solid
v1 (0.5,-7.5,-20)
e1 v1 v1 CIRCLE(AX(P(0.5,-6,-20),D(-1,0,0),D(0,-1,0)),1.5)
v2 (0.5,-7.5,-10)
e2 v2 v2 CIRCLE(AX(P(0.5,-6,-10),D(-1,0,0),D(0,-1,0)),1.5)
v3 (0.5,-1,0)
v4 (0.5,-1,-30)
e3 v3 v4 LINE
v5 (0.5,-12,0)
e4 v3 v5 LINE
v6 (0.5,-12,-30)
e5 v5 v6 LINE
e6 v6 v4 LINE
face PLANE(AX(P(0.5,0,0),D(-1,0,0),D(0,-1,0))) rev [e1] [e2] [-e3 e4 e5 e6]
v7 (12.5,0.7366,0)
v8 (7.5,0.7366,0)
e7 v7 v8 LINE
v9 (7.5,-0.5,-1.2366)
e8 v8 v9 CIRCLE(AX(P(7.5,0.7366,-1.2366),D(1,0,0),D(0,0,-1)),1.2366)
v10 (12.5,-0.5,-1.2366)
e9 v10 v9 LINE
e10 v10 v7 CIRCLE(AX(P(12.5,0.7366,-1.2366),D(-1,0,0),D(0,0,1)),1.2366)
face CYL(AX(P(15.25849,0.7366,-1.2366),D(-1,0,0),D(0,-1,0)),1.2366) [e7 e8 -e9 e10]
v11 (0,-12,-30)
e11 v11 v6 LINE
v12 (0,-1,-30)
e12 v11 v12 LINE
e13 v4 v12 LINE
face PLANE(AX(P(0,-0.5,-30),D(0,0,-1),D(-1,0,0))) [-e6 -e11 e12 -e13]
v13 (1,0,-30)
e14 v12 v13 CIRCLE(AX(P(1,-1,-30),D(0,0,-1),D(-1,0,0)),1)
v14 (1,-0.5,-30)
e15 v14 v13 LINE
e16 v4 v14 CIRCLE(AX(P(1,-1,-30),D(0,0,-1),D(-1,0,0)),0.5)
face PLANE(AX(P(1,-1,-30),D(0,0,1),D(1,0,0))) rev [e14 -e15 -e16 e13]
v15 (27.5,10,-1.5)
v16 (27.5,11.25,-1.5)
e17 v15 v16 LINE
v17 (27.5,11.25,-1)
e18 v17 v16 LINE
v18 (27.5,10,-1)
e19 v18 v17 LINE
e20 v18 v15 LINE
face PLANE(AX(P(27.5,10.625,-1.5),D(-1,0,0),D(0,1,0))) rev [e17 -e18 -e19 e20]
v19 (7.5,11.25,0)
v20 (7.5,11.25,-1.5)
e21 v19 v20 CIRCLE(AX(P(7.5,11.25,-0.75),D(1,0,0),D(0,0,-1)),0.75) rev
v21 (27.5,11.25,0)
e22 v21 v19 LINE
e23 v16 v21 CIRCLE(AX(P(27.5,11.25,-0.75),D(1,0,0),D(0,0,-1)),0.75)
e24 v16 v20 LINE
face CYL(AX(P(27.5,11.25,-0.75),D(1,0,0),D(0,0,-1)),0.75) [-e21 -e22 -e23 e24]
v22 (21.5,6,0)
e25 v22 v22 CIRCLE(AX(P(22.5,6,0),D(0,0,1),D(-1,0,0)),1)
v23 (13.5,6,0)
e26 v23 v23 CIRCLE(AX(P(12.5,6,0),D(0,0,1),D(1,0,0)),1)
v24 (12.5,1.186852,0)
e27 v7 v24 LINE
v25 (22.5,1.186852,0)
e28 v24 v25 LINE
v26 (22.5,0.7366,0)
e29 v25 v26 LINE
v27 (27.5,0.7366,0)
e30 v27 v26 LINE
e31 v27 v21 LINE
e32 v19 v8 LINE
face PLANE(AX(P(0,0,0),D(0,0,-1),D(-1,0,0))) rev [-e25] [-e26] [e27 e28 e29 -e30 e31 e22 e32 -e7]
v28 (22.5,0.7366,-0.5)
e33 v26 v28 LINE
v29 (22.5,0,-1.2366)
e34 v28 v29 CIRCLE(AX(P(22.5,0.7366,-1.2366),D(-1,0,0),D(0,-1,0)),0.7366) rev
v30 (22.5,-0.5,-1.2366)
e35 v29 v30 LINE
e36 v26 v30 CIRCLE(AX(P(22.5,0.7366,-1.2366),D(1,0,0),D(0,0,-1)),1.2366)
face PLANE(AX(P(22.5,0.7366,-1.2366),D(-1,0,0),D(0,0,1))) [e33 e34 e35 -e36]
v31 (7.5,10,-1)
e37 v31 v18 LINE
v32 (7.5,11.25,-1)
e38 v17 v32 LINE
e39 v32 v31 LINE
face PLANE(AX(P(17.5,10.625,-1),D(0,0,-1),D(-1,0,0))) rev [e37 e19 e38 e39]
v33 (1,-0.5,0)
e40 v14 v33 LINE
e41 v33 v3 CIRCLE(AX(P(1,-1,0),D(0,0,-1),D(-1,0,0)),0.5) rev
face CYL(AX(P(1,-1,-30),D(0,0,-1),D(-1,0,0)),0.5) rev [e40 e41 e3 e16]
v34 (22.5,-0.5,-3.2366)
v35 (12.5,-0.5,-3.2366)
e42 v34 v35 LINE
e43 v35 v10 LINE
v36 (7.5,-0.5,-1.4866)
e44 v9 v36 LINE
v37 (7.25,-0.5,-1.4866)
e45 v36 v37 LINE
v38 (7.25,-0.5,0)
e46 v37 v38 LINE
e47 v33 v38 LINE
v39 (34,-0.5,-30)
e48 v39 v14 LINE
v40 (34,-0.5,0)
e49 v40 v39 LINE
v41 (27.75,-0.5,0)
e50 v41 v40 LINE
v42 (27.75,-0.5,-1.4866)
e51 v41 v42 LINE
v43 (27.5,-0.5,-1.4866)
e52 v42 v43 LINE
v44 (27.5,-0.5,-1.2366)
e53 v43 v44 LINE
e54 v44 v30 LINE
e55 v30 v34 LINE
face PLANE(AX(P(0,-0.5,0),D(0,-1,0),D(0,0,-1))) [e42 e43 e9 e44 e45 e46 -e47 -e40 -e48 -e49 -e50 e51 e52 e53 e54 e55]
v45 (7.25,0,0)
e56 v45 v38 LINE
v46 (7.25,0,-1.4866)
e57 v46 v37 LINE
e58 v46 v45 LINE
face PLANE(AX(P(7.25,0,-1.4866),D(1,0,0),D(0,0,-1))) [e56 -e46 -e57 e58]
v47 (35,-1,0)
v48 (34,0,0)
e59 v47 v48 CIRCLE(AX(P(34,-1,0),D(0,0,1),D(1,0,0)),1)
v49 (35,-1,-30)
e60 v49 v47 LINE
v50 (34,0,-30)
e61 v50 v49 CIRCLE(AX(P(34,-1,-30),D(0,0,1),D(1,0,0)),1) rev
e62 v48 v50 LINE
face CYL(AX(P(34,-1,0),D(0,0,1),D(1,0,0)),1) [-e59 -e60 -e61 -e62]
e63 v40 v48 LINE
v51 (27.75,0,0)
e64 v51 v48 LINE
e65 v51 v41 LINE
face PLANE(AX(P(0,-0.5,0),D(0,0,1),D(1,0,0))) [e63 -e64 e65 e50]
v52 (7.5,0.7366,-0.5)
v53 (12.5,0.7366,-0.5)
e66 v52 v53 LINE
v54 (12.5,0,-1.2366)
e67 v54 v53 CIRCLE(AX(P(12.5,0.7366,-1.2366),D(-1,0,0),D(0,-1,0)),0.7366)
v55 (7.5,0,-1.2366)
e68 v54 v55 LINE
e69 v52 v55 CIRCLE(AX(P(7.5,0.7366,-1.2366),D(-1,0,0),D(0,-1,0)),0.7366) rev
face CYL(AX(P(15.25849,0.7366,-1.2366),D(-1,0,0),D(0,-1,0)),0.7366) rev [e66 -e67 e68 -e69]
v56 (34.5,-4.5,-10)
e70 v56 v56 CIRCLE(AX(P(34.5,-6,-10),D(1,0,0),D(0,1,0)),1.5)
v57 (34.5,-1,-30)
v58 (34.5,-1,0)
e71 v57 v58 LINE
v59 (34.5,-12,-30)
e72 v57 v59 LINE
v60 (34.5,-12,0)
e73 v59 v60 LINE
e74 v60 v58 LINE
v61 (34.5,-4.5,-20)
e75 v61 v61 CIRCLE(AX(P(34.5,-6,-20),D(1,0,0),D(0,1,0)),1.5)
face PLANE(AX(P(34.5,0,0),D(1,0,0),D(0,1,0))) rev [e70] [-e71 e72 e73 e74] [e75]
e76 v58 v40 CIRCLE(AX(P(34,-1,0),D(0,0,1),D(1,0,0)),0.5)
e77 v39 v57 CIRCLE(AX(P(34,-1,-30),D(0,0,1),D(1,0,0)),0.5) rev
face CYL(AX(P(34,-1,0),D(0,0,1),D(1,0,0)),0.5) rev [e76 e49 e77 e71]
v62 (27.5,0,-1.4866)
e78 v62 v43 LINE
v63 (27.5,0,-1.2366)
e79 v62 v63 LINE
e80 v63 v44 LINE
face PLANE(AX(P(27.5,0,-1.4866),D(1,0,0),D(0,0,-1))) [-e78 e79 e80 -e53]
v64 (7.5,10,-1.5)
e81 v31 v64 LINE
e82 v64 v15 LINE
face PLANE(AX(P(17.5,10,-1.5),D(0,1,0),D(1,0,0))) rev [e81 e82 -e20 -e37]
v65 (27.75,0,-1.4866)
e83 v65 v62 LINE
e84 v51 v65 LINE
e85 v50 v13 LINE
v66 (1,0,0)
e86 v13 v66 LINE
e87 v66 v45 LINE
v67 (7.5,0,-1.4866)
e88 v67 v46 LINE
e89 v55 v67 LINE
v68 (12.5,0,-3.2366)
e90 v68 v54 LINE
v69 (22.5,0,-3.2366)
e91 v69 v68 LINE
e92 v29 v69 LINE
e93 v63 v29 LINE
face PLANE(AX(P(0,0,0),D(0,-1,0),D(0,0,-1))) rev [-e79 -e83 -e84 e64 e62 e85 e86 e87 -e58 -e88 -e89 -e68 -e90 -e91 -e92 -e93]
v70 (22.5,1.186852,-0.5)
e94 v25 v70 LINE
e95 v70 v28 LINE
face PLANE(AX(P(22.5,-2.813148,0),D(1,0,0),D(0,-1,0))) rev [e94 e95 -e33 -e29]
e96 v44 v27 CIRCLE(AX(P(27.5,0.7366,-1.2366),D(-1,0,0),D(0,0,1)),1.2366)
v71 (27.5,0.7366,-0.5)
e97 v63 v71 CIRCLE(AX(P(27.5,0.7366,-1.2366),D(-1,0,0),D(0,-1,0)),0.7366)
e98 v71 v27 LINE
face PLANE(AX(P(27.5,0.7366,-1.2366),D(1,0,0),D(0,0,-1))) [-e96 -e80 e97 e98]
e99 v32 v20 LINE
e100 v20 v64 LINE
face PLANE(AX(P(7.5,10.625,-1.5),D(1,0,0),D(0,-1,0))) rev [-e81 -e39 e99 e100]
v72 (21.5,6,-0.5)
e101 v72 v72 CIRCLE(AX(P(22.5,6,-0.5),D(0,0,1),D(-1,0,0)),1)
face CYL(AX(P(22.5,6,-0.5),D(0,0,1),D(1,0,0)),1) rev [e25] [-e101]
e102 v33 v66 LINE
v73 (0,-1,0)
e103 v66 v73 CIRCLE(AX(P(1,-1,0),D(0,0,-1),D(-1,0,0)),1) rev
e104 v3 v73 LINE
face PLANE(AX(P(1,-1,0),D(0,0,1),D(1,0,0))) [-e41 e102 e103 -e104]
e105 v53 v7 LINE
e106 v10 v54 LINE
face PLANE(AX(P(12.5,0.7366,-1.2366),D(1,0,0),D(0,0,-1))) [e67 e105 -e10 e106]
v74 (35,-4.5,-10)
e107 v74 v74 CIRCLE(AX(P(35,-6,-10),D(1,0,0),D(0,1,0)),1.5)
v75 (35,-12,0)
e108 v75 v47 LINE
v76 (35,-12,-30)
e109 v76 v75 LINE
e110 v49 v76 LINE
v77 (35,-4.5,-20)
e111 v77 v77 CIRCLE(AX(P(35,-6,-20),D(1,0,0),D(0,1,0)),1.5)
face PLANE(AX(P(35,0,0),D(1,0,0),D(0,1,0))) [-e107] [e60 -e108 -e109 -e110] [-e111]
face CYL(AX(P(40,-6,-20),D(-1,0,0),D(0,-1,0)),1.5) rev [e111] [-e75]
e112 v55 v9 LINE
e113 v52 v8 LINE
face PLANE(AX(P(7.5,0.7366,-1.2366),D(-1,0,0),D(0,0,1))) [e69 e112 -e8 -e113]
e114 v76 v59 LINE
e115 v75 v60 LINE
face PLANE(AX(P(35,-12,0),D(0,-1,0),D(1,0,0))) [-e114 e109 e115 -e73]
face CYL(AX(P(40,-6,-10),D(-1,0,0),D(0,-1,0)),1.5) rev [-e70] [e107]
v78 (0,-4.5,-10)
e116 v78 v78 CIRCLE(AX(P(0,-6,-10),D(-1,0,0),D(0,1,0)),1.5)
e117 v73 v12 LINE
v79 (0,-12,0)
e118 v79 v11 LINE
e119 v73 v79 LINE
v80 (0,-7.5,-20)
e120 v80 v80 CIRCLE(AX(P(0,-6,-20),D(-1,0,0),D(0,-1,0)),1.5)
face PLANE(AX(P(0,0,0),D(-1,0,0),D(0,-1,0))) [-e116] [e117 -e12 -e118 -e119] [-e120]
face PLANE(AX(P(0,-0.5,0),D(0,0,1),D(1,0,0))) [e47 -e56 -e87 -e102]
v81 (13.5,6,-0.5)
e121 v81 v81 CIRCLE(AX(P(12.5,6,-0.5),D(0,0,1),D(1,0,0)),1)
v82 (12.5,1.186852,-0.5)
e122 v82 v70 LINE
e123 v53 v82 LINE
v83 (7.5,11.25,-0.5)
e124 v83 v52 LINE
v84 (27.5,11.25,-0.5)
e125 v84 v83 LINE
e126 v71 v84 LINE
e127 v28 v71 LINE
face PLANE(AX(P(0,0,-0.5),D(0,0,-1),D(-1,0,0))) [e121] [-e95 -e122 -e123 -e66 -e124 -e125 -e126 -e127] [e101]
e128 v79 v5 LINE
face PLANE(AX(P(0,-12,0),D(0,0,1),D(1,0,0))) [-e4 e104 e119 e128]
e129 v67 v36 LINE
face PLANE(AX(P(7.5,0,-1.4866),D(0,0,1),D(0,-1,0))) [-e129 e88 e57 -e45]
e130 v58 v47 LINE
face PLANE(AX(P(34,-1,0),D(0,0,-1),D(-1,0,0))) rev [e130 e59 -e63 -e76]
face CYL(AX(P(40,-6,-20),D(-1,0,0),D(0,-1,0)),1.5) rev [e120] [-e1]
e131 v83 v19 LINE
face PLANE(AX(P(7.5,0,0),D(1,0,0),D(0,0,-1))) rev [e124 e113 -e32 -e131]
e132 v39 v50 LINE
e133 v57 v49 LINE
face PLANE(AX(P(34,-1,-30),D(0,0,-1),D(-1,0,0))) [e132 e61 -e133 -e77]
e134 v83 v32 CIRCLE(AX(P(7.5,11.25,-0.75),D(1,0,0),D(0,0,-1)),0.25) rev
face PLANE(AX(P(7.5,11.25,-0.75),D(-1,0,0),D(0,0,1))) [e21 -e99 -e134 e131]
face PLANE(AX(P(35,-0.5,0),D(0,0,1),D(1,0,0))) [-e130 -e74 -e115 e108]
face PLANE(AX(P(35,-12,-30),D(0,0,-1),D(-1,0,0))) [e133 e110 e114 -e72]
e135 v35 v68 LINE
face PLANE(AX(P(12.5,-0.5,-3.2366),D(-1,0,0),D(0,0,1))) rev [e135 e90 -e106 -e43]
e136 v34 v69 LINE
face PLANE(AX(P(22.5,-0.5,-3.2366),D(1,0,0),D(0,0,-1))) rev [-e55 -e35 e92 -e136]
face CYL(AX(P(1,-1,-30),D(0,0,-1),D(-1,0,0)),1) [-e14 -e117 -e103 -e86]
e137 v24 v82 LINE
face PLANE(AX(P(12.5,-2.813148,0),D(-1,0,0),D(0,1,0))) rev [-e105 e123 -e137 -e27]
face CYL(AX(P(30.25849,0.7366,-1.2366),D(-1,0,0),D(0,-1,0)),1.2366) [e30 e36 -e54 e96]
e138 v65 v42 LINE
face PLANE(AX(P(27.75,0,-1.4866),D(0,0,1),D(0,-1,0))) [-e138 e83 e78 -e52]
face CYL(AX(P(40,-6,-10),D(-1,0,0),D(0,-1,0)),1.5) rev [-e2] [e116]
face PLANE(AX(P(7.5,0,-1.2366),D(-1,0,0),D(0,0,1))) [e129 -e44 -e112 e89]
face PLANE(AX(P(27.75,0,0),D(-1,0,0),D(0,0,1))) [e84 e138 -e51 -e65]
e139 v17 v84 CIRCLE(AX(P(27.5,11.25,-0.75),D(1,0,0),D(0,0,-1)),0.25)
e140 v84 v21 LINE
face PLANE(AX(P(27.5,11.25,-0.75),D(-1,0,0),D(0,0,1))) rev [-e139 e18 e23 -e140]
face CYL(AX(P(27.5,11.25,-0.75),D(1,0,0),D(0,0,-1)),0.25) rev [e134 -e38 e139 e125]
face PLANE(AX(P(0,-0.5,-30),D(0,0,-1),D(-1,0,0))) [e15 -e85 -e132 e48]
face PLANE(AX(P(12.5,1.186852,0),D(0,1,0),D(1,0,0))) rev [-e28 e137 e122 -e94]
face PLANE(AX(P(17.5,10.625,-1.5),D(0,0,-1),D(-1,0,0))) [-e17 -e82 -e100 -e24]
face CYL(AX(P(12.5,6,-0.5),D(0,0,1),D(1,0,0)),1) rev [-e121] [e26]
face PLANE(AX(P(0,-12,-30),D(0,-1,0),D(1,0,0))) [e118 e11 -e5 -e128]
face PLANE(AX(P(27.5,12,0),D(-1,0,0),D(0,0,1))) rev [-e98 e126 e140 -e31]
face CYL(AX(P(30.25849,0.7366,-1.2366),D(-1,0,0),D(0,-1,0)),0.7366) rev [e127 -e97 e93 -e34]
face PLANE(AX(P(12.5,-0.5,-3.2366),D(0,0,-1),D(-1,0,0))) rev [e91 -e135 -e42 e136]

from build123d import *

# Parameters (mm, degrees)
SKETCH1_W                     = 35
SKETCH1_H                     = 30
BASE_FLANGE1_DEPTH            = 0.5
EDGE_FLANGE1_STRIP_W          = 3
EDGE_FLANGE1_STRIP_H          = 0.5
EDGE_FLANGE1_STRIP_CUT_DEPTH  = 30
EDGE_FLANGE1_DEPTH            = 30
EDGE_FLANGE2_STRIP_W          = 3
EDGE_FLANGE2_STRIP_H          = 0.5
EDGE_FLANGE2_STRIP_CUT_DEPTH  = 30
EDGE_FLANGE2_DEPTH            = 30
SKETCH12_R                    = 1.5
CUT_EXTRUDE1_DEPTH            = 40
EDGE_FLANGE4_STRIP_W          = 3.4732
EDGE_FLANGE4_STRIP_H          = 0.5
EDGE_FLANGE4_STRIP_CUT_DEPTH  = 20
EDGE_FLANGE4_RELIEF_W         = 3.7232
EDGE_FLANGE4_RELIEF_H         = 0.25
EDGE_FLANGE4_RELIEF_CUT_DEPTH = 0.5
EDGE_FLANGE4_DEPTH            = 20
SKETCH25_R                    = 1
CUT_EXTRUDE2_DEPTH            = 0.5
HEM1_START                    = 7.5
HEM1_DEPTH                    = 20
HEM1_2_DEPTH                  = 20
UNFOLD1_OUTLINE_W             = 20
UNFOLD1_OUTLINE_H             = 1.5
UNFOLD1_DEPTH                 = 13
UNFOLD1_START                 = -0.5
UNFOLD1_2_OUTLINE_W           = 20
UNFOLD1_2_OUTLINE_H           = 11.076547656
UNFOLD1_2_OUTLINE_R           = 1
UNFOLD1_2_DEPTH               = 0.5
UNFOLD1_START_2               = 7.5
UNFOLD1_3_DEPTH               = 20
SKETCH30_W                    = 10
SKETCH30_H                    = 4
CUT_EXTRUDE3_DEPTH            = 0.5
FOLD1_START                   = 7.5
FOLD1_DEPTH                   = 20
FOLD1_START_2                 = 13.5000001
FOLD1_2_DEPTH                 = 7.9999998
FOLD1_3_DEPTH                 = 3.9999999
FOLD1_START_3                 = 23.5000001
FOLD1_4_DEPTH                 = 3.9999999
FOLD1_5_DEPTH                 = 5
FOLD1_START_4                 = 22.5
FOLD1_6_DEPTH                 = 5
FOLD1_START_5                 = -0.5
FOLD1_7_DEPTH                 = 0.5
FOLD1_START_6                 = 11.4999999
FOLD1_8_DEPTH                 = 12.0000002


with BuildPart() as part:
    # Base-Flange1: sheet metal written as solids
    # Sketch1 → Base-Flange1 (new body)
    with BuildSketch(Plane(origin=(0, 0, 0), x_dir=(1, 0, 0), z_dir=(0, 1, 0))):
        with Locations((17.5, 15)):
            Rectangle(SKETCH1_W, SKETCH1_H)
    extrude(amount=-BASE_FLANGE1_DEPTH)

    # Edge-Flange1: sheet metal written as solids
    # Edge-Flange1 strip (on a plane across the edge) → Edge-Flange1 strip cut (cut)
    with BuildSketch(Plane(origin=(35, -0.5, -30), x_dir=(-1, 0, 0), z_dir=(0, 0, 1))):
        with Locations((-0.5, -0.25)):
            Rectangle(EDGE_FLANGE1_STRIP_W, EDGE_FLANGE1_STRIP_H)
    extrude(amount=EDGE_FLANGE1_STRIP_CUT_DEPTH, mode=Mode.SUBTRACT)

    # Edge-Flange1 section (on a plane across the edge) → Edge-Flange1 (add)
    with BuildSketch(Plane(origin=(35, -0.5, -30), x_dir=(-1, 0, 0), z_dir=(0, 0, 1))):
        with BuildLine():
            Line((0, 0.5), (0, 11.5))
            Line((0, 11.5), (0.5, 11.5))
            Line((0.5, 11.5), (0.5, 0.5))
            ThreePointArc((0.5, 0.5), (0.646446609, 0.146446609), (1, 0))
            Line((1, 0), (1, -0.5))
            ThreePointArc((1, -0.5), (0.292893219, -0.207106781), (0, 0.5))
        make_face()
    extrude(amount=EDGE_FLANGE1_DEPTH)

    # Edge-Flange2: sheet metal written as solids
    # Edge-Flange2 strip (on a plane across the edge) → Edge-Flange2 strip cut (cut)
    with BuildSketch(Plane(origin=(0, -0.5, 0), x_dir=(1, 0, 0), z_dir=(0, 0, -1))):
        with Locations((-0.5, -0.25)):
            Rectangle(EDGE_FLANGE2_STRIP_W, EDGE_FLANGE2_STRIP_H)
    extrude(amount=EDGE_FLANGE2_STRIP_CUT_DEPTH, mode=Mode.SUBTRACT)

    # Edge-Flange2 section (on a plane across the edge) → Edge-Flange2 (add)
    with BuildSketch(Plane(origin=(0, -0.5, 0), x_dir=(1, 0, 0), z_dir=(0, 0, -1))):
        with BuildLine():
            Line((0, 0.5), (0, 11.5))
            Line((0, 11.5), (0.5, 11.5))
            Line((0.5, 11.5), (0.5, 0.5))
            ThreePointArc((0.5, 0.5), (0.646446609, 0.146446609), (1, 0))
            Line((1, 0), (1, -0.5))
            ThreePointArc((1, -0.5), (0.292893219, -0.207106781), (0, 0.5))
        make_face()
    extrude(amount=EDGE_FLANGE2_DEPTH)

    # Sketch12 → Cut-Extrude1 (cut)
    with BuildSketch(Plane.ZY):
        with Locations(Location((-20, -6, 0), (0, 0, 270))):
            Circle(SKETCH12_R)
        with Locations(Location((-10, -6, 0), (0, 0, 270))):
            Circle(SKETCH12_R)
    extrude(amount=-CUT_EXTRUDE1_DEPTH, mode=Mode.SUBTRACT)

    # Edge-Flange4: sheet metal written as solids
    # Edge-Flange4 strip (on a plane across the edge) → Edge-Flange4 strip cut (cut)
    with BuildSketch(Plane(origin=(7.5, 0, 0), x_dir=(0, 0, -1), z_dir=(1, 0, 0))):
        with Locations((-0.5, -0.25)):
            Rectangle(EDGE_FLANGE4_STRIP_W, EDGE_FLANGE4_STRIP_H)
    extrude(amount=EDGE_FLANGE4_STRIP_CUT_DEPTH, mode=Mode.SUBTRACT)

    # Edge-Flange4 relief (on the sheet) → Edge-Flange4 relief cut (cut)
    with BuildSketch(Plane(origin=(7.5, 0, -1.2366), x_dir=(0, 0, -1), z_dir=(0, 1, 0))):
        with Locations((-1.6116, 0.125)):
            Rectangle(EDGE_FLANGE4_RELIEF_W, EDGE_FLANGE4_RELIEF_H)
        with Locations((-1.6116, -20.125)):
            Rectangle(EDGE_FLANGE4_RELIEF_W, EDGE_FLANGE4_RELIEF_H)
    extrude(amount=-EDGE_FLANGE4_RELIEF_CUT_DEPTH, mode=Mode.SUBTRACT)

    # Edge-Flange4 section (on a plane across the edge) → Edge-Flange4 (add)
    with BuildSketch(Plane(origin=(7.5, 0, 0), x_dir=(0, 0, -1), z_dir=(1, 0, 0))):
        with BuildLine():
            Line((0, 0.7366), (0, 12))
            Line((0, 12), (0.5, 12))
            Line((0.5, 12), (0.5, 0.7366))
            ThreePointArc((0.5, 0.7366), (0.715745145, 0.215745145), (1.2366, 0))
            Line((1.2366, 0), (1.2366, -0.5))
            ThreePointArc((1.2366, -0.5), (0.362191754, -0.137808246), (0, 0.7366))
        make_face()
    extrude(amount=EDGE_FLANGE4_DEPTH)

    # Sketch25 → Cut-Extrude2 (cut)
    with BuildSketch(Plane.XY):
        with Locations((12.5, 6)):
            Circle(SKETCH25_R)
        with Locations(Location((22.5, 6, 0), (0, 0, 180))):
            Circle(SKETCH25_R)
    extrude(amount=-CUT_EXTRUDE2_DEPTH, mode=Mode.SUBTRACT)

    # Hem1: read off the stored shape, not the designer's step
    # Hem1 outline → Hem1 (cut)
    with BuildSketch(Plane.YZ.offset(HEM1_START)):
        with BuildLine():
            ThreePointArc((11.25, 0), (11.683012702, -0.137627564), (11.957106781, -0.5))
            Line((11.957106781, -0.5), (12, -0.5))
            Line((12, -0.5), (12, 0))
            Line((12, 0), (11.25, 0))
        make_face()
    extrude(amount=HEM1_DEPTH, mode=Mode.SUBTRACT)

    # Hem1 2 outline → Hem1 2 (add)
    with BuildSketch(Plane.YZ.offset(HEM1_START)):
        with BuildLine():
            Line((10, -1), (10, -1.5))
            Line((10, -1.5), (11.25, -1.5))
            ThreePointArc((11.25, -1.5), (11.862372436, -1.183012702), (11.957106781, -0.5))
            Line((11.957106781, -0.5), (11.25, -0.5))
            ThreePointArc((11.25, -0.5), (11.5, -0.75), (11.25, -1))
            Line((11.25, -1), (10, -1))
        make_face()
    extrude(amount=HEM1_2_DEPTH)

    # Unfold1: read off the stored shape, not the designer's step
    # Unfold1 outline → Unfold1 (cut)
    with BuildSketch(Plane(origin=(0, 0, 0), x_dir=(1, 0, 0), z_dir=(0, 1, 0))):
        with Locations((17.5, 0.75)):
            Rectangle(UNFOLD1_OUTLINE_W, UNFOLD1_OUTLINE_H)
    extrude(amount=UNFOLD1_DEPTH, mode=Mode.SUBTRACT)

    # Unfold1 2 outline → Unfold1 2 (add)
    with BuildSketch(Plane(origin=(0, 0, 0), x_dir=(1, 0, 0), z_dir=(0, 1, 0)).offset(UNFOLD1_START)):
        with Locations((17.5, -4.038273828)):
            Rectangle(UNFOLD1_2_OUTLINE_W, UNFOLD1_2_OUTLINE_H)
        with Locations((12.5, -5.576547656)):
            Circle(UNFOLD1_2_OUTLINE_R, mode=Mode.SUBTRACT)
        with Locations((22.5, -5.576547656)):
            Circle(UNFOLD1_2_OUTLINE_R, mode=Mode.SUBTRACT)
    extrude(amount=UNFOLD1_2_DEPTH)

    # Unfold1 3 outline → Unfold1 3 (add)
    with BuildSketch(Plane.YZ.offset(UNFOLD1_START_2)):
        with BuildLine():
            Line((-0.5, 10.826547656), (-0.5, 9.576547656))
            Line((-0.5, 9.576547656), (0, 9.576547656))
            Line((0, 9.576547656), (0, 10.826547656))
            ThreePointArc((0, 10.826547656), (0.25, 11.076547656), (0.5, 10.826547656))
            Line((0.5, 10.826547656), (0.5, 9.576547656))
            Line((0.5, 9.576547656), (1, 9.576547656))
            Line((1, 9.576547656), (1, 10.826547656))
            ThreePointArc((1, 10.826547656), (0.25, 11.576547656), (-0.5, 10.826547656))
        make_face()
    extrude(amount=UNFOLD1_3_DEPTH)

    # Sketch30 → Cut-Extrude3 (cut)
    with BuildSketch(Plane(origin=(0, 0, 0), x_dir=(1, 0, 0), z_dir=(0, 1, 0))):
        with Locations((17.5, 1.2366)):
            Rectangle(SKETCH30_W, SKETCH30_H)
    extrude(amount=-CUT_EXTRUDE3_DEPTH, mode=Mode.SUBTRACT)

    # Fold1: read off the stored shape, not the designer's step
    # Fold1 outline → Fold1 (cut)
    with BuildSketch(Plane.YZ.offset(FOLD1_START)):
        with BuildLine():
            ThreePointArc((-0.5, -1.2366), (-0.367949483, -0.68058741), (0, -0.243322596))
            Line((0, -0.243322596), (0, 10.826547656))
            ThreePointArc((0, 10.826547656), (0.25, 11.076547656), (0.5, 10.826547656))
            Line((0.5, 10.826547656), (0.5, 9.576547656))
            Line((0.5, 9.576547656), (1, 9.576547656))
            Line((1, 9.576547656), (1, 10.826547656))
            ThreePointArc((1, 10.826547656), (0.25, 11.576547656), (-0.5, 10.826547656))
            Line((-0.5, 10.826547656), (-0.5, -1.2366))
        make_face()
    extrude(amount=FOLD1_DEPTH, mode=Mode.SUBTRACT)

    # Fold1 3 outline → Fold1 3 (add)
    with BuildSketch(Plane.YZ.offset(FOLD1_START)):
        with BuildLine():
            ThreePointArc((0.7366, 0), (0.348725843, -0.062405298), (0, -0.243322596))
            Line((0, -0.243322596), (0, -1.2366))
            ThreePointArc((0, -1.2366), (0.215745145, -0.715745145), (0.7366, -0.5))
            Line((0.7366, -0.5), (11.25, -0.5))
            ThreePointArc((11.25, -0.5), (11.5, -0.75), (11.25, -1))
            Line((11.25, -1), (10, -1))
            Line((10, -1), (10, -1.5))
            Line((10, -1.5), (11.25, -1.5))
            ThreePointArc((11.25, -1.5), (12, -0.75), (11.25, 0))
            Line((11.25, 0), (0.7366, 0))
        make_face()
    extrude(amount=FOLD1_3_DEPTH)

    # Fold1 4 outline → Fold1 4 (add)
    with BuildSketch(Plane.YZ.offset(FOLD1_START_3)):
        with BuildLine():
            ThreePointArc((0.7366, 0), (0.348725843, -0.062405298), (0, -0.243322596))
            Line((0, -0.243322596), (0, -1.2366))
            ThreePointArc((0, -1.2366), (0.215745145, -0.715745145), (0.7366, -0.5))
            Line((0.7366, -0.5), (11.25, -0.5))
            ThreePointArc((11.25, -0.5), (11.5, -0.75), (11.25, -1))
            Line((11.25, -1), (10, -1))
            Line((10, -1), (10, -1.5))
            Line((10, -1.5), (11.25, -1.5))
            ThreePointArc((11.25, -1.5), (12, -0.75), (11.25, 0))
            Line((11.25, 0), (0.7366, 0))
        make_face()
    extrude(amount=FOLD1_4_DEPTH)

    # Fold1 5 outline → Fold1 5 (add)
    with BuildSketch(Plane.YZ.offset(FOLD1_START)):
        with BuildLine():
            Line((1.186852344, 0), (0.7366, 0))
            ThreePointArc((0.7366, 0), (0.348725843, -0.062405298), (0, -0.243322596))
            Line((0, -0.243322596), (0, -1.2366))
            ThreePointArc((0, -1.2366), (0.215745145, -0.715745145), (0.7366, -0.5))
            Line((0.7366, -0.5), (1.186852344, -0.5))
            Line((1.186852344, -0.5), (1.186852344, 0))
        make_face()
    extrude(amount=FOLD1_5_DEPTH)

    # Fold1 6 outline → Fold1 6 (add)
    with BuildSketch(Plane.YZ.offset(FOLD1_START_4)):
        with BuildLine():
            Line((1.186852344, 0), (0.7366, 0))
            ThreePointArc((0.7366, 0), (0.348725843, -0.062405298), (0, -0.243322596))
            Line((0, -0.243322596), (0, -1.2366))
            ThreePointArc((0, -1.2366), (0.215745145, -0.715745145), (0.7366, -0.5))
            Line((0.7366, -0.5), (1.186852344, -0.5))
            Line((1.186852344, -0.5), (1.186852344, 0))
        make_face()
    extrude(amount=FOLD1_6_DEPTH)



with BuildPart() as body_2:
    # Fold1 2 outline → Fold1 2 (new body)
    with BuildSketch(Plane.YZ.offset(FOLD1_START_2)):
        with BuildLine():
            Line((11.25, 0), (1.186852344, 0))
            Line((1.186852344, 0), (1.186852344, -0.5))
            Line((1.186852344, -0.5), (11.25, -0.5))
            ThreePointArc((11.25, -0.5), (11.5, -0.75), (11.25, -1))
            Line((11.25, -1), (10, -1))
            Line((10, -1), (10, -1.5))
            Line((10, -1.5), (11.25, -1.5))
            ThreePointArc((11.25, -1.5), (12, -0.75), (11.25, 0))
        make_face()
    extrude(amount=FOLD1_2_DEPTH)


with BuildPart() as part_1:
    add(part.part)

    add(body_2.part)  # Fold1 7 merges body 2
    # Fold1 7 outline → Fold1 7 (add)
    with BuildSketch(Plane.XY.offset(FOLD1_START_5)):
        with BuildLine():
            Line((13.5000001, 1.186852344), (13.5, 6))
            ThreePointArc((13.5, 6), (12.5, 5), (11.5, 6))
            Line((11.5, 6), (11.4999999, 1.186852344))
            Line((11.4999999, 1.186852344), (13.5000001, 1.186852344))
        make_face()
        with BuildLine():
            ThreePointArc((11.5, 6), (12.5, 7), (13.5, 6))
            Line((13.5, 6), (13.5000001, 10))
            Line((13.5000001, 10), (11.4999999, 10))
            Line((11.4999999, 10), (11.5, 6))
        make_face()
        with BuildLine():
            Line((21.5, 6), (21.4999999, 1.186852344))
            Line((21.4999999, 1.186852344), (23.5000001, 1.186852344))
            Line((23.5000001, 1.186852344), (23.5, 6))
            ThreePointArc((23.5, 6), (22.5, 5), (21.5, 6))
        make_face()
        with BuildLine():
            Line((23.5000001, 10), (21.4999999, 10))
            Line((21.4999999, 10), (21.5, 6))
            ThreePointArc((21.5, 6), (22.5, 7), (23.5, 6))
            Line((23.5, 6), (23.5000001, 10))
        make_face()
    extrude(amount=FOLD1_7_DEPTH)

    # Fold1 8 outline → Fold1 8 (add)
    with BuildSketch(Plane.YZ.offset(FOLD1_START_6)):
        with BuildLine():
            Line((11.25, 0), (10, 0))
            Line((10, 0), (10, -0.5))
            Line((10, -0.5), (11.25, -0.5))
            ThreePointArc((11.25, -0.5), (11.5, -0.75), (11.25, -1))
            Line((11.25, -1), (10, -1))
            Line((10, -1), (10, -1.5))
            Line((10, -1.5), (11.25, -1.5))
            ThreePointArc((11.25, -1.5), (12, -0.75), (11.25, 0))
        make_face()
    extrude(amount=FOLD1_8_DEPTH)


solid = part_1.part
